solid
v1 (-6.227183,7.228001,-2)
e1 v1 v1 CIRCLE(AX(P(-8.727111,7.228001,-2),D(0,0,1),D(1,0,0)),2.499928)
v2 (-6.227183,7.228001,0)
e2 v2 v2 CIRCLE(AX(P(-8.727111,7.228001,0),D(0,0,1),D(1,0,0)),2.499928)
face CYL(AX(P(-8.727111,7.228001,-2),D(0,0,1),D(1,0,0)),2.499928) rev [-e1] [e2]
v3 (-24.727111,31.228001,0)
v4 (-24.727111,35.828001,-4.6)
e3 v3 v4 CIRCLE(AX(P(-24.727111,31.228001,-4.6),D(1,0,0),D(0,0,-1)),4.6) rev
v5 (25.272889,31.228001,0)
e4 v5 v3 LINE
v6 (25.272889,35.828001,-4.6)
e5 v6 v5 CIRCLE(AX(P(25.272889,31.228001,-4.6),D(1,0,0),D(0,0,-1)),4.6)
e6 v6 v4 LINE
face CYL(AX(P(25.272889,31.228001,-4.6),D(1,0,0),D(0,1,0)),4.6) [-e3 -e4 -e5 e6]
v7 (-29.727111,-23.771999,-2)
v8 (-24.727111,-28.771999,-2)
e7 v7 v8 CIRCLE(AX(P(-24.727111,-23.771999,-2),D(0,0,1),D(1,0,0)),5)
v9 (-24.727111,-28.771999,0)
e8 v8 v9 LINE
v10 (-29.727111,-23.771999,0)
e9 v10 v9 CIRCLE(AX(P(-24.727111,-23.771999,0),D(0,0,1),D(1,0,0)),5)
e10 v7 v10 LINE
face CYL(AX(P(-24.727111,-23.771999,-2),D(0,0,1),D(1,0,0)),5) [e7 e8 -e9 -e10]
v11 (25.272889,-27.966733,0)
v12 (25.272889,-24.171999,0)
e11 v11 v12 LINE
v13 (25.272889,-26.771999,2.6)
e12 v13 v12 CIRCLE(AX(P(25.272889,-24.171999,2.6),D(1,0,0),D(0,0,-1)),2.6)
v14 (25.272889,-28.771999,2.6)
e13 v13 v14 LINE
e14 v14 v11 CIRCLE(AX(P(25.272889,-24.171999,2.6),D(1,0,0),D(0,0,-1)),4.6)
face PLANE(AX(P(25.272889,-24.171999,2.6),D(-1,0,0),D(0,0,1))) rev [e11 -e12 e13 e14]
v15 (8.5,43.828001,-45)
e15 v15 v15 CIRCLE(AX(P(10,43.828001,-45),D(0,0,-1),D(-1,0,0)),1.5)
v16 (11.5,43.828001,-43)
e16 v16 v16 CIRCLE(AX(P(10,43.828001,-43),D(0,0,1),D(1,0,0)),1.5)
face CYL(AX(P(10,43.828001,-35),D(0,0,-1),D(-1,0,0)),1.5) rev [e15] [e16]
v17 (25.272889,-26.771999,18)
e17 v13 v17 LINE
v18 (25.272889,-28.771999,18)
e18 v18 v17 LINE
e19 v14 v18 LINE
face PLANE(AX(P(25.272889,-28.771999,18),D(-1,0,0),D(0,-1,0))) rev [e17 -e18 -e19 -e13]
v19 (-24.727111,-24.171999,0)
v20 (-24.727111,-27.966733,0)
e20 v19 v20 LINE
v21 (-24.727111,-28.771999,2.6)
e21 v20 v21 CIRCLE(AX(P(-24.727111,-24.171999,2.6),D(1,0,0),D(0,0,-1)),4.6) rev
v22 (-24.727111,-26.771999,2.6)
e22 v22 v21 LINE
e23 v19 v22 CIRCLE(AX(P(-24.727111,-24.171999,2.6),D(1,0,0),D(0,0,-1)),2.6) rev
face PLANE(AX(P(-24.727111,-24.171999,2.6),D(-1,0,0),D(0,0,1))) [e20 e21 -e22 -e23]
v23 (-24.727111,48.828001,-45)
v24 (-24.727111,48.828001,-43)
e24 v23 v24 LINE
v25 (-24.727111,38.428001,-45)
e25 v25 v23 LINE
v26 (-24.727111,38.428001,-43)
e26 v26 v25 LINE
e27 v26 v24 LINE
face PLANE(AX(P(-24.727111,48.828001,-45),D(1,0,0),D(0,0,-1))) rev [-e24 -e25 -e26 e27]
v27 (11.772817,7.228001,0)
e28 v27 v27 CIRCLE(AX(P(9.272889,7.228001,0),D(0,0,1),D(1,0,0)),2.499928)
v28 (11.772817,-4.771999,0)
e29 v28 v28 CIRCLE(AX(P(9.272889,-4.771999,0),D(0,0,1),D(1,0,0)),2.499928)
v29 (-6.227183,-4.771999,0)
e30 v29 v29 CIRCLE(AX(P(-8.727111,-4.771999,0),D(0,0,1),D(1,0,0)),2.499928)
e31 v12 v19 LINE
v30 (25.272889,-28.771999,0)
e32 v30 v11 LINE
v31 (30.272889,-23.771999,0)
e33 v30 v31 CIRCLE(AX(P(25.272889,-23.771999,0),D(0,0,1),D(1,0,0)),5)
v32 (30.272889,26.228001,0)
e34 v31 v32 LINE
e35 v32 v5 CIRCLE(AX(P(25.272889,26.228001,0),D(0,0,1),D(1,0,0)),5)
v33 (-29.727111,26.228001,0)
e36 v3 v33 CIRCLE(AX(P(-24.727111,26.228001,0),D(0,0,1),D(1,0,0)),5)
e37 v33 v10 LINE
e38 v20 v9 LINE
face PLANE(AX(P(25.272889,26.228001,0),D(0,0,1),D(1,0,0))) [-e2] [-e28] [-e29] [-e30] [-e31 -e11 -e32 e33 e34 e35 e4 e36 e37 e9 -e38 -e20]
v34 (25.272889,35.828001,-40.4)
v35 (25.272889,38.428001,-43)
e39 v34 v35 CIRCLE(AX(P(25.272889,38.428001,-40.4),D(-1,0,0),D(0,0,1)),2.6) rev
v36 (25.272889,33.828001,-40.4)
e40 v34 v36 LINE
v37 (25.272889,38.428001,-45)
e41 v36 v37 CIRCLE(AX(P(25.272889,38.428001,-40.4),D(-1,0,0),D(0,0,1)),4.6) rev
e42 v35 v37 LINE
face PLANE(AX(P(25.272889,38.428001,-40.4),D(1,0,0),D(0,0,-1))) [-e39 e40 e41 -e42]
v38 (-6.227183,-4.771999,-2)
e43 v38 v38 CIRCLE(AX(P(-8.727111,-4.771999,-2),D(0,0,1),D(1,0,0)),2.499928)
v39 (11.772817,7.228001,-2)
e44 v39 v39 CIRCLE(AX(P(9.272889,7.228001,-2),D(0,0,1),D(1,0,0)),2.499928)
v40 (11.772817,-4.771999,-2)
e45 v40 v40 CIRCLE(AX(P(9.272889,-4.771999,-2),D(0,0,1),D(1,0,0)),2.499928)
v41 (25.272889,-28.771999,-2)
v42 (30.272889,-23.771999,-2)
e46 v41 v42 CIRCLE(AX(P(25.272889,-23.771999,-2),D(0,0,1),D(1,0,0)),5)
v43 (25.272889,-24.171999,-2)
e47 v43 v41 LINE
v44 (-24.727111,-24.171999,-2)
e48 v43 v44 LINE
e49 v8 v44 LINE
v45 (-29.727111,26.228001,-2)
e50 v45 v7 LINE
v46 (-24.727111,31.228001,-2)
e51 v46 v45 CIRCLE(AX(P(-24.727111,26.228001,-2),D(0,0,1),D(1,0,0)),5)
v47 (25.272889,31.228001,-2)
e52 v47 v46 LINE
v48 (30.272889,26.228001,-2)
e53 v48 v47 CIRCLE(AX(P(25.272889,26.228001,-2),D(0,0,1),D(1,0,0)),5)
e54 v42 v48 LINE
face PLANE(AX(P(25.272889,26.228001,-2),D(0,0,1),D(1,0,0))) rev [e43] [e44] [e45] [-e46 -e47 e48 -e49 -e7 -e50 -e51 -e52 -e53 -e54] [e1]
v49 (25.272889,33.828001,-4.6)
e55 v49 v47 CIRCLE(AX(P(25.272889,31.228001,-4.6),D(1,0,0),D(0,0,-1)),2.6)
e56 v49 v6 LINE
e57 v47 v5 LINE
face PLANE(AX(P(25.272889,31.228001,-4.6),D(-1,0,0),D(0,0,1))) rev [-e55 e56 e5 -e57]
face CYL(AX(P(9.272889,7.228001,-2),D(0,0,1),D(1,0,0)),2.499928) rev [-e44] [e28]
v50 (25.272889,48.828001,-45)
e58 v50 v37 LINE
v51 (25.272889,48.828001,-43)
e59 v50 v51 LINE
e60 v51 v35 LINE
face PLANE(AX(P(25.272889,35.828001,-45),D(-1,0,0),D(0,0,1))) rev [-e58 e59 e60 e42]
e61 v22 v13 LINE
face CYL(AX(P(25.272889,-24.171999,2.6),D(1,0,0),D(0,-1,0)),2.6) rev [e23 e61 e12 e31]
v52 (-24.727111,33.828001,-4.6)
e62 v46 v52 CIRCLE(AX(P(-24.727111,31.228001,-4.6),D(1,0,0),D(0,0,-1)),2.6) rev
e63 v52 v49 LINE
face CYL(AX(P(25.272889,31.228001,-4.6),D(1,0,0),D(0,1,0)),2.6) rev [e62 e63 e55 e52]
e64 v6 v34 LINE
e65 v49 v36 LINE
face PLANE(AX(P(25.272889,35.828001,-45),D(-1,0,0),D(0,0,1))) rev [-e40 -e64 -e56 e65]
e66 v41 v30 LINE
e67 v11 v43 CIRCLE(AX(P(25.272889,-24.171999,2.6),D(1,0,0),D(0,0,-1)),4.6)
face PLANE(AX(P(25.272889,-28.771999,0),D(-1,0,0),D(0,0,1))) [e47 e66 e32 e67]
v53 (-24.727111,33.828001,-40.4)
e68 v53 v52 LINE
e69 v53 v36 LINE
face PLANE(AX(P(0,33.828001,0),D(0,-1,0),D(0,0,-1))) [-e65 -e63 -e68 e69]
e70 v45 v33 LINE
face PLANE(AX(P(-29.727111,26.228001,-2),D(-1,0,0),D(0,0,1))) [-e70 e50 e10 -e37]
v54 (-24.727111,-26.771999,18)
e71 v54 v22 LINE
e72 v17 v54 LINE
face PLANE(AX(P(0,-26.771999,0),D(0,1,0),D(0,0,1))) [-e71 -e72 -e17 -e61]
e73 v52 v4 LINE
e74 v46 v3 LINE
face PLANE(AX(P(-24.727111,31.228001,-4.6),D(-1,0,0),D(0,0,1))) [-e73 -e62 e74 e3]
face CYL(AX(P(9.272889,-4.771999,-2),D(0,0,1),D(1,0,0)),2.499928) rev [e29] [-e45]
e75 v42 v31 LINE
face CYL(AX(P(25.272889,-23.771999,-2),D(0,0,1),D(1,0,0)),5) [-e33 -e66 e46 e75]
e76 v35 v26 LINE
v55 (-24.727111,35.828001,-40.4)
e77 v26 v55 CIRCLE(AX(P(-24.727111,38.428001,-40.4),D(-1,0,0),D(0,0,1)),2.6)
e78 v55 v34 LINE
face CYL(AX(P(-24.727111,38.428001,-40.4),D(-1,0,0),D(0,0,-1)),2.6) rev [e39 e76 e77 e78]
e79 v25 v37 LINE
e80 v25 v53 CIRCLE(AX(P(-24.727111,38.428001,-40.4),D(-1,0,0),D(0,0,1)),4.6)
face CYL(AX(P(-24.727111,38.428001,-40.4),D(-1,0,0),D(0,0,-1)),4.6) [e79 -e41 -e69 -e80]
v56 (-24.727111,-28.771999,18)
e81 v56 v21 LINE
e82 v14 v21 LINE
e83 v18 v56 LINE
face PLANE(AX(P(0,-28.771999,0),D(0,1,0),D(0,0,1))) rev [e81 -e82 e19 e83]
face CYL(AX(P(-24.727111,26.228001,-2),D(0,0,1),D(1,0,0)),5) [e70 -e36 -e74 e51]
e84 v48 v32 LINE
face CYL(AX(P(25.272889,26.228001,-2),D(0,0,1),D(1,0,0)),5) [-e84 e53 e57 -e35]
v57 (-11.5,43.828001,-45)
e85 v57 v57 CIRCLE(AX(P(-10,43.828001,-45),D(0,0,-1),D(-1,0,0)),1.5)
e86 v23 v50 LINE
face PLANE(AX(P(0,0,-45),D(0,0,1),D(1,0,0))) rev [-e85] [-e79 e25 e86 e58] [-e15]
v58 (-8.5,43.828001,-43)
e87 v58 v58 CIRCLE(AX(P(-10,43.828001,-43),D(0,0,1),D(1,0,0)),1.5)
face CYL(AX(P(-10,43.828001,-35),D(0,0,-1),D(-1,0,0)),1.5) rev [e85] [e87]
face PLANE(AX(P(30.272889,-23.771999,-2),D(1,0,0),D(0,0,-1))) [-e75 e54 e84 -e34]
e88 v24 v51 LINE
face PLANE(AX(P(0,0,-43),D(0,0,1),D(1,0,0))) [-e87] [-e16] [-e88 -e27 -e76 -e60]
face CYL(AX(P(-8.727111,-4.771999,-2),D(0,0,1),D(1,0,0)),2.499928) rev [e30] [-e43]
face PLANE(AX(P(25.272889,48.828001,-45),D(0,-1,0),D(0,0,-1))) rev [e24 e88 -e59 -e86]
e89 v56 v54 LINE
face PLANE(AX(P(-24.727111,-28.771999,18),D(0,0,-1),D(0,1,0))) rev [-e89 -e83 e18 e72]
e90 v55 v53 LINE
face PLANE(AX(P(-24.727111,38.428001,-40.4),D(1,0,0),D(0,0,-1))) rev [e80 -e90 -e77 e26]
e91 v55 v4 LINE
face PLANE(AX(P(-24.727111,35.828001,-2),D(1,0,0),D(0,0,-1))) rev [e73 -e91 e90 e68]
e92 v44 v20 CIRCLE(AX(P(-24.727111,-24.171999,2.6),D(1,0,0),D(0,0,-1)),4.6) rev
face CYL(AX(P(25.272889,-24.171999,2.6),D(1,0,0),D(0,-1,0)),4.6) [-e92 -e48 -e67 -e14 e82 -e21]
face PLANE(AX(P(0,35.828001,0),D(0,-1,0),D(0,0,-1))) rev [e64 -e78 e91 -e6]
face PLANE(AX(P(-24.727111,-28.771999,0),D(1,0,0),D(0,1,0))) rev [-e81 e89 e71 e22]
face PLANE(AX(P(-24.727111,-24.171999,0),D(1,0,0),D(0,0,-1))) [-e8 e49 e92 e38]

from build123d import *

# Parameters (mm, degrees)
BASE_FLANGE2_DEPTH           = 2
EDGE_FLANGE1_DEPTH           = 50
EDGE_FLANGE2_STRIP_W         = 13.2
EDGE_FLANGE2_STRIP_H         = 2
EDGE_FLANGE2_STRIP_CUT_DEPTH = 50
EDGE_FLANGE2_DEPTH           = 50
SKETCH18_R                   = 1.5
CUT_EXTRUDE1_DEPTH           = 10
EDGE_FLANGE3_STRIP_W         = 13.2
EDGE_FLANGE3_STRIP_H         = 2
EDGE_FLANGE3_STRIP_CUT_DEPTH = 50
EDGE_FLANGE3_DEPTH           = 50


# Sheet-metal steps are written as plain solids
with BuildPart() as part:
    # Sketch1 → Base-Flange2 (new body)
    with BuildSketch(Plane.XY):
        with BuildLine():
            Line((25.272889038, 31.228000671), (-24.727110962, 31.228000671))
            ThreePointArc((-24.727110962, 31.228000671), (-28.262644868, 29.763534577), (-29.727110962, 26.228000671))
            Line((-29.727110962, 26.228000671), (-29.727110962, -23.771999329))
            ThreePointArc((-29.727110962, -23.771999329), (-28.262644868, -27.307533234), (-24.727110962, -28.771999329))
            Line((-24.727110962, -28.771999329), (25.272889038, -28.771999329))
            ThreePointArc((25.272889038, -28.771999329), (28.808422944, -27.307533234), (30.272889038, -23.771999329))
            Line((30.272889038, -23.771999329), (30.272889038, 26.228000671))
            ThreePointArc((30.272889038, 26.228000671), (28.808422944, 29.763534577), (25.272889038, 31.228000671))
        make_face()
        with BuildLine():
            ThreePointArc((11.772817004, -4.771999329), (11.040605056, -3.004283311), (9.272889038, -2.272071362))
            ThreePointArc((9.272889038, -2.272071362), (7.505173021, -3.004283311), (6.772961072, -4.771999329))
            ThreePointArc((6.772961072, -4.771999329), (9.272889038, -7.271927295), (11.772817004, -4.771999329))
        make_face(mode=Mode.SUBTRACT)
        with BuildLine():
            ThreePointArc((-8.727110962, -2.272071362), (-10.494826979, -3.004283311), (-11.227038928, -4.771999329))
            ThreePointArc((-11.227038928, -4.771999329), (-8.727110962, -7.271927295), (-6.227182996, -4.771999329))
            ThreePointArc((-6.227182996, -4.771999329), (-6.959394944, -3.004283311), (-8.727110962, -2.272071362))
        make_face(mode=Mode.SUBTRACT)
        with BuildLine():
            ThreePointArc((6.772961072, 7.228000671), (9.272889038, 4.728072705), (11.772817004, 7.228000671))
            ThreePointArc((11.772817004, 7.228000671), (11.040605056, 8.995716689), (9.272889038, 9.727928638))
            ThreePointArc((9.272889038, 9.727928638), (7.505173021, 8.995716689), (6.772961072, 7.228000671))
        make_face(mode=Mode.SUBTRACT)
        with BuildLine():
            ThreePointArc((-8.727110962, 9.727928638), (-10.494826979, 8.995716689), (-11.227038928, 7.228000671))
            ThreePointArc((-11.227038928, 7.228000671), (-8.727110962, 4.728072705), (-6.227182996, 7.228000671))
            ThreePointArc((-6.227182996, 7.228000671), (-6.959394944, 8.995716689), (-8.727110962, 9.727928638))
        make_face(mode=Mode.SUBTRACT)
    extrude(amount=-BASE_FLANGE2_DEPTH)

    # Edge-Flange1 section (across the edge) → Edge-Flange1 (add)
    with BuildSketch(Plane(origin=(-24.727110962, 33.828000671, -2), x_dir=(0, -1, 0), z_dir=(1, 0, 0))):
        with BuildLine():
            Line((-2, 2.6), (-2, 43))
            Line((-2, 43), (0, 43))
            Line((0, 43), (0, 2.6))
            ThreePointArc((0, 2.6), (0.761522369, 0.761522369), (2.6, 0))
            Line((2.6, 0), (2.6, -2))
            ThreePointArc((2.6, -2), (-0.652691193, -0.652691193), (-2, 2.6))
        make_face()
    extrude(amount=EDGE_FLANGE1_DEPTH)

    # Edge-Flange2 strip (across the edge) → Edge-Flange2 strip cut (cut)
    with BuildSketch(Plane(origin=(25.272889038, 35.828000671, -45), x_dir=(0, 0, 1), z_dir=(-1, 0, 0))):
        with Locations((-2, -1)):
            Rectangle(EDGE_FLANGE2_STRIP_W, EDGE_FLANGE2_STRIP_H)
    extrude(amount=EDGE_FLANGE2_STRIP_CUT_DEPTH, mode=Mode.SUBTRACT)

    # Edge-Flange2 section (across the edge) → Edge-Flange2 (add)
    with BuildSketch(Plane(origin=(25.272889038, 35.828000671, -45), x_dir=(0, 0, 1), z_dir=(-1, 0, 0))):
        with BuildLine():
            Line((0, 2.6), (0, 13))
            Line((0, 13), (2, 13))
            Line((2, 13), (2, 2.6))
            ThreePointArc((2, 2.6), (2.761522369, 0.761522369), (4.6, 0))
            Line((4.6, 0), (4.6, -2))
            ThreePointArc((4.6, -2), (1.347308807, -0.652691193), (0, 2.6))
        make_face()
    extrude(amount=EDGE_FLANGE2_DEPTH)

    # Sketch18 → Cut-Extrude1 (cut)
    with BuildSketch(Plane(origin=(0, 0, -45), x_dir=(-1, 0, 0), z_dir=(0, 0, -1))):
        with Locations((-10, 43.828000671)):
            Circle(SKETCH18_R)
        with Locations((10, 43.828000671)):
            Circle(SKETCH18_R)
    extrude(amount=-CUT_EXTRUDE1_DEPTH, mode=Mode.SUBTRACT)

    # Edge-Flange3 strip (across the edge) → Edge-Flange3 strip cut (cut)
    with BuildSketch(Plane(origin=(-24.727110962, -28.771999329, 0), x_dir=(0, 1, 0), z_dir=(1, 0, 0))):
        with Locations((-2, -1)):
            Rectangle(EDGE_FLANGE3_STRIP_W, EDGE_FLANGE3_STRIP_H)
    extrude(amount=EDGE_FLANGE3_STRIP_CUT_DEPTH, mode=Mode.SUBTRACT)

    # Edge-Flange3 section (across the edge) → Edge-Flange3 (add)
    with BuildSketch(Plane(origin=(-24.727110962, -28.771999329, 0), x_dir=(0, 1, 0), z_dir=(1, 0, 0))):
        with BuildLine():
            Line((0, 2.6), (0, 18))
            Line((0, 18), (2, 18))
            Line((2, 18), (2, 2.6))
            ThreePointArc((2, 2.6), (2.761522369, 0.761522369), (4.6, 0))
            Line((4.6, 0), (4.6, -2))
            ThreePointArc((4.6, -2), (1.347308807, -0.652691193), (0, 2.6))
        make_face()
    extrude(amount=EDGE_FLANGE3_DEPTH)


solid = part.part
